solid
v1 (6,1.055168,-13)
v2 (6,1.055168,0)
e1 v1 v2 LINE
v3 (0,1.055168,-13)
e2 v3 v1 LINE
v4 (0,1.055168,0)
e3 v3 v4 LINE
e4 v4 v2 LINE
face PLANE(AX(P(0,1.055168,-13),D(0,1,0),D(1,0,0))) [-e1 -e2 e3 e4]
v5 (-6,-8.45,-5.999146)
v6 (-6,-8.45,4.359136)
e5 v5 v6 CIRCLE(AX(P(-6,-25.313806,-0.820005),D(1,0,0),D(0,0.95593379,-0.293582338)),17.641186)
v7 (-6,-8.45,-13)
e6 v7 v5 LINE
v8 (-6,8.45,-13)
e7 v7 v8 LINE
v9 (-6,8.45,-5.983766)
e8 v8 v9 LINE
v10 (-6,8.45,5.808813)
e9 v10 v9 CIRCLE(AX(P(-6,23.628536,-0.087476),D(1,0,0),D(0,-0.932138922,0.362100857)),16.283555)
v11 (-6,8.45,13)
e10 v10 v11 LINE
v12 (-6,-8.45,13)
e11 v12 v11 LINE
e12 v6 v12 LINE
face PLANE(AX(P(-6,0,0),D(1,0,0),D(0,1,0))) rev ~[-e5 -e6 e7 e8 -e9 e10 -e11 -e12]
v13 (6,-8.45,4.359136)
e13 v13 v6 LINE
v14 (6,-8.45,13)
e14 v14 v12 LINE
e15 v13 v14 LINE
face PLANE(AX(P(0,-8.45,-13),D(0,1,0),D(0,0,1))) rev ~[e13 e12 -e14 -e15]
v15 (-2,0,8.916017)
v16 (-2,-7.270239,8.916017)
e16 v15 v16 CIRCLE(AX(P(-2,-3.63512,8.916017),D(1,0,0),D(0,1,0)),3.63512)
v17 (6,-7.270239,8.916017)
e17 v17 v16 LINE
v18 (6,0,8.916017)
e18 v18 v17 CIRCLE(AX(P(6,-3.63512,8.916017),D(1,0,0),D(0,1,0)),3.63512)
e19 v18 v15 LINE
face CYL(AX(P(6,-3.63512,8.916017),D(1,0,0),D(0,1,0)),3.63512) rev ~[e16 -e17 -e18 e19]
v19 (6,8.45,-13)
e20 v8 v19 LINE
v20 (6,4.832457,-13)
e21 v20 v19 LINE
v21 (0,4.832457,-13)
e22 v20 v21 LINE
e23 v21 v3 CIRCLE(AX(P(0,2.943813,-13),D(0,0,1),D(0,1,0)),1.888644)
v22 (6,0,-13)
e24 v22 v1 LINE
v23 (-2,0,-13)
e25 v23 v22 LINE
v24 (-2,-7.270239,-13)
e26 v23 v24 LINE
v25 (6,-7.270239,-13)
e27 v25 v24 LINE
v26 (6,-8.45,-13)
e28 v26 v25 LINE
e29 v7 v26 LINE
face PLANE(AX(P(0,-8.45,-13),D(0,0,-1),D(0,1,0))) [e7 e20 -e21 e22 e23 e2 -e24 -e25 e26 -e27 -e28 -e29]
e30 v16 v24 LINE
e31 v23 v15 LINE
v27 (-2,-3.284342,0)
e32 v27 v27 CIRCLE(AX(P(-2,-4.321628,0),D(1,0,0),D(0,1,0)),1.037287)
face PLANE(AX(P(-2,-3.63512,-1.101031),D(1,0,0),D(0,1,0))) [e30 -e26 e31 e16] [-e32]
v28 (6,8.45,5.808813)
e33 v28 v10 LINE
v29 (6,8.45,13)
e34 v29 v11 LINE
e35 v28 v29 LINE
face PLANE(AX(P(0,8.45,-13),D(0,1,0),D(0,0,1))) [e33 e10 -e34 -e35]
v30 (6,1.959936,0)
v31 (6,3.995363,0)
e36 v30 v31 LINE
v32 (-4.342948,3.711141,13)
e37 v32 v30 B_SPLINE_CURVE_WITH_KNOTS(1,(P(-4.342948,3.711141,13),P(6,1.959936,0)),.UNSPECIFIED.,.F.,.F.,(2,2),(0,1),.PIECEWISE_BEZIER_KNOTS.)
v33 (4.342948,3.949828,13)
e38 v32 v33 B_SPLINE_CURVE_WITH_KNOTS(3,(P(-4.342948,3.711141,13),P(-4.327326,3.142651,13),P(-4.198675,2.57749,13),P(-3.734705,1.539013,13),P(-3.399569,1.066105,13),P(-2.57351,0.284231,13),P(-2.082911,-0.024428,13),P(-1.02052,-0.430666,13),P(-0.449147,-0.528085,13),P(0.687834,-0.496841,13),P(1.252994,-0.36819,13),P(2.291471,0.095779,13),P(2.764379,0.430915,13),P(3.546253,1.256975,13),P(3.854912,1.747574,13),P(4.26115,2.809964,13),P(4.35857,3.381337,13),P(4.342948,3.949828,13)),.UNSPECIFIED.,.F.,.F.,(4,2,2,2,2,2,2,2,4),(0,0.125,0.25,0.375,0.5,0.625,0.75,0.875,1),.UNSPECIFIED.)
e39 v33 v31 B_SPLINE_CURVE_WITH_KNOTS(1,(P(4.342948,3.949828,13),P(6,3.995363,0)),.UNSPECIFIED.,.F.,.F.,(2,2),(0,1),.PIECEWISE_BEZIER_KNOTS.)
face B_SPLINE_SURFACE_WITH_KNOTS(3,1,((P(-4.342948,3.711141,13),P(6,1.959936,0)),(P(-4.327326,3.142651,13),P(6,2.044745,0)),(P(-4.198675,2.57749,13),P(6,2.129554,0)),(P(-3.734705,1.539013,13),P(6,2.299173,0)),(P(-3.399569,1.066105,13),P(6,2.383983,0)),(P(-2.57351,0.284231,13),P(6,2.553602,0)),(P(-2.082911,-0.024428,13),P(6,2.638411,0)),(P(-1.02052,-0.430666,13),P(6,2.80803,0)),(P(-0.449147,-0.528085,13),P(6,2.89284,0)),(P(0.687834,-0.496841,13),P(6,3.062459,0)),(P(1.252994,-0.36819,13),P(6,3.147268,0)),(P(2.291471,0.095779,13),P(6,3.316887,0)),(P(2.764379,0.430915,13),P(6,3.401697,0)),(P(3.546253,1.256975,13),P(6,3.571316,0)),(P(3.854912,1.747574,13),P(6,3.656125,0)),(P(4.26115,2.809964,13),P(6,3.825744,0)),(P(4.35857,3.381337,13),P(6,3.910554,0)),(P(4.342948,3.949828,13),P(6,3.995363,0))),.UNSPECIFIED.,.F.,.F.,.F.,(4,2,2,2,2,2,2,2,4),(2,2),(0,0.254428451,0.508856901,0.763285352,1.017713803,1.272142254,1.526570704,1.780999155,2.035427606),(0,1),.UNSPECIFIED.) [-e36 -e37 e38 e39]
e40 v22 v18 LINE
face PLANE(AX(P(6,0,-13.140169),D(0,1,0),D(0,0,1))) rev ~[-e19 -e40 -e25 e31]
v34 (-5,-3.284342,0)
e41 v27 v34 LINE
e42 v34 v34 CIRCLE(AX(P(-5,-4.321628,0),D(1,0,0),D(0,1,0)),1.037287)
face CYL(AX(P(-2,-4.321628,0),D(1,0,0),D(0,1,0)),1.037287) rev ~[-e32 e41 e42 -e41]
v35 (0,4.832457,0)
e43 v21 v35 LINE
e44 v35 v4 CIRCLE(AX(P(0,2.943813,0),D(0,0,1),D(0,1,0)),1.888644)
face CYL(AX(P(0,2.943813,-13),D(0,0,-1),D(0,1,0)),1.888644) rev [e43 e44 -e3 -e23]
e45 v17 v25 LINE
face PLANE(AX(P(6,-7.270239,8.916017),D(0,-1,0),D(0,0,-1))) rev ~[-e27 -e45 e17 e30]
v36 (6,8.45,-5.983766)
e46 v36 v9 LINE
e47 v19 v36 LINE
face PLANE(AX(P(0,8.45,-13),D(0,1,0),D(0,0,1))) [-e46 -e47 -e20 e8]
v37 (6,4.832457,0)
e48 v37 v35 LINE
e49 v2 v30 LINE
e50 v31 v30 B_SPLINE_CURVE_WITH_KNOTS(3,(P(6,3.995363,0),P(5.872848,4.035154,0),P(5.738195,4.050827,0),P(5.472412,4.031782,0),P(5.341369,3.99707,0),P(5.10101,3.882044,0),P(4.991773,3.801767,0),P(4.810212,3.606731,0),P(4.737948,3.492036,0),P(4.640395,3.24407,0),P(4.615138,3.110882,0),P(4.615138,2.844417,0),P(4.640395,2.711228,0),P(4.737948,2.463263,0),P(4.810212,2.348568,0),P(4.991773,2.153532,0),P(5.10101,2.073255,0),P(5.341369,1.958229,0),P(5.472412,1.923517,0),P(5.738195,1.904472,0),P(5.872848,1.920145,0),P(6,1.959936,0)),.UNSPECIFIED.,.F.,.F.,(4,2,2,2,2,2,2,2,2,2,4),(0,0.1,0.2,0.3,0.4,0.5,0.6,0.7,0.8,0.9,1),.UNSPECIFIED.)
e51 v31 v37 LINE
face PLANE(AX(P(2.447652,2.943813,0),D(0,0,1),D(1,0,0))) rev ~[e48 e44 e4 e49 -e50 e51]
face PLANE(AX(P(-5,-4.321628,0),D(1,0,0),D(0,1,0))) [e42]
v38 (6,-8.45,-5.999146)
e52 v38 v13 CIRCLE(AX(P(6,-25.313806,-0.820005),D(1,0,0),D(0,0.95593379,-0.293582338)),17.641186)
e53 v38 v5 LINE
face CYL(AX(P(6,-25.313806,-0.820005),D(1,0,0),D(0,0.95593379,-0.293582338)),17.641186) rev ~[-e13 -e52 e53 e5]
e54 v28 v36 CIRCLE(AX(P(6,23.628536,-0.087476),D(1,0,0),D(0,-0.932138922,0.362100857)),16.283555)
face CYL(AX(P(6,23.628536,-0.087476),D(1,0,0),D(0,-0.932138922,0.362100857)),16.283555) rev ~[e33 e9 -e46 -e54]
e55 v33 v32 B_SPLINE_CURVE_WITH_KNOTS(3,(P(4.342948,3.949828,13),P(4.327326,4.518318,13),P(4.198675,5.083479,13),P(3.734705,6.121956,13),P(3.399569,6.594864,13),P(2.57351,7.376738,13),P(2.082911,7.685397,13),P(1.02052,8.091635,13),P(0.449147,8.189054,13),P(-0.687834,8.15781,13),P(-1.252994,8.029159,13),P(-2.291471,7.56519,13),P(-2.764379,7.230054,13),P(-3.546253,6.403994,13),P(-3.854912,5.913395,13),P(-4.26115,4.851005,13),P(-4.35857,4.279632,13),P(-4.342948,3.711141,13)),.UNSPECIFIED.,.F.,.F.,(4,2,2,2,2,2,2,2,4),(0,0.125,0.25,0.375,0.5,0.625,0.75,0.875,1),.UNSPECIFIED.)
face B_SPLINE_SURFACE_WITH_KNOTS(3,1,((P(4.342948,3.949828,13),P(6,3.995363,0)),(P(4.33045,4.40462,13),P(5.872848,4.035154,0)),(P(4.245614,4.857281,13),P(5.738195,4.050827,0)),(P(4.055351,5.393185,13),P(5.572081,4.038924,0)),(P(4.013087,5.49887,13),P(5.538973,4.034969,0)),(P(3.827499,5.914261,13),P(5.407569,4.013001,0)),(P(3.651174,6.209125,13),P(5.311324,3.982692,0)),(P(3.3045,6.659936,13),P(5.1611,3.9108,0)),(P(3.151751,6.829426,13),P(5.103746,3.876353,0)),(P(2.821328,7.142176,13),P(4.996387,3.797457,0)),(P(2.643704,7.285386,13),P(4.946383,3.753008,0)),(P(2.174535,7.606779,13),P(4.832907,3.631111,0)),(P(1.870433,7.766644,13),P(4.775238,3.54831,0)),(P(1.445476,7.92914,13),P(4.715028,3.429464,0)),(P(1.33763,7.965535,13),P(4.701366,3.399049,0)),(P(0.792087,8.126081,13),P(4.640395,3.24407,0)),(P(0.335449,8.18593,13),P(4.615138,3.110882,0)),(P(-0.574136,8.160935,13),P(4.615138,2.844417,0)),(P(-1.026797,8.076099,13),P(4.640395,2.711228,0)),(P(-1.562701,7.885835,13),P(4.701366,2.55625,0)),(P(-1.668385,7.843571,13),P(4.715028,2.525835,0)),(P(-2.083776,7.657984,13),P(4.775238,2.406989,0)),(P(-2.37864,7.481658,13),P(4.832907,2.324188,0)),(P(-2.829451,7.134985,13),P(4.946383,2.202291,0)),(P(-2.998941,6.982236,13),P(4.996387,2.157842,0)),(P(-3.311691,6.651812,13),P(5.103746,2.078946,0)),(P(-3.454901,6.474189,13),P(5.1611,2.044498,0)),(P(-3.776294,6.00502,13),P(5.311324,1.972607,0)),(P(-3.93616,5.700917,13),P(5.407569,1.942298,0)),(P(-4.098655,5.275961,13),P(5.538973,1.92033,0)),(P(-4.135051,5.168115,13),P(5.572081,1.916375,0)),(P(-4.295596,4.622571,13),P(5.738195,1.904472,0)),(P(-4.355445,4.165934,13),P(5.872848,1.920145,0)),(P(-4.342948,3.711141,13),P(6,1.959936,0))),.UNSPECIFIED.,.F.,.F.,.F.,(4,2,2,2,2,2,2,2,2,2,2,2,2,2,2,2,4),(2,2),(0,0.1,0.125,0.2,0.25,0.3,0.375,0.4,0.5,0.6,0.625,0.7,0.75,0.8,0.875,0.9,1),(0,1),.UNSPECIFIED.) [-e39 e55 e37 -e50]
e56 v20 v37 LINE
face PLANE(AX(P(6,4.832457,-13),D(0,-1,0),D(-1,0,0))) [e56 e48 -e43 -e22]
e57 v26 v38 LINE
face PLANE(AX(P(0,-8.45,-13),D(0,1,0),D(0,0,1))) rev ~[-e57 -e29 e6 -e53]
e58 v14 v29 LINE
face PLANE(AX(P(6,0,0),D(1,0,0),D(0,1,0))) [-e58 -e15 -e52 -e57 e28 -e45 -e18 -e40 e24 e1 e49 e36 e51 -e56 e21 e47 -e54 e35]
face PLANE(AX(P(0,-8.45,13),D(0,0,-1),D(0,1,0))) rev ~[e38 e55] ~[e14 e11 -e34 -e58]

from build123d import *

# Parameters (mm, degrees)
F0_W      = 16.9
F0_H      = 26
F1_DEPTH  = 6
F4_DEPTH  = 8
F7_DEPTH  = 13
F13_R     = 1.0372867361
F14_DEPTH = 3
F16_DEPTH = 12


# Not quite as in the source:
# - the arcs of a loft's sections are written as splines that run evenly, so that the points pair up as in the source's solid


with BuildPart() as f1:
    # F0 (on Right) → F1 (new body, symmetric)
    with BuildSketch(Plane.YZ):
        Rectangle(F0_W, F0_H)
    extrude(amount=F1_DEPTH, both=True)

    # F3 (on offset) → F4 (cut)
    with BuildSketch(Plane.YZ.offset(6)):
        with BuildLine():
            Line((0, -13.1401689723), (0, 0))
            Line((0, 0), (0, 8.9160166681))
            ThreePointArc((0, 8.9160166681), (-3.6351196468, 12.5511363149), (-7.2702392936, 8.9160166681))
            Line((-7.2702392936, 8.9160166681), (-7.2702392936, 0))
            Line((-7.2702392936, 0), (-7.2702392936, -13.1401689723))
            Line((-7.2702392936, -13.1401689723), (0, -13.1401689723))
        make_face()
    extrude(amount=-F4_DEPTH, mode=Mode.SUBTRACT)

    # F6 (on offset) → F7 (cut)
    with BuildSketch(Plane.XY.offset(-13)):
        with BuildLine():
            Line((0, 1.0551682208), (6, 1.0551682208))
            Line((6, 1.0551682208), (6, 4.8324568197))
            Line((6, 4.8324568197), (0, 4.8324568197))
            ThreePointArc((0, 4.8324568197), (-1.8886442995, 2.9438125202), (0, 1.0551682208))
        make_face()
    extrude(amount=F7_DEPTH, mode=Mode.SUBTRACT)

    # F10 (on offset) → F11 section 0
    with BuildSketch(Plane.XY.offset(13)):
        with BuildLine():
            add(Edge.make_bspline(
                [(4.3429478235, 3.9498277403), (4.3273258404, 4.518318281), (4.1986746967, 5.0834789619), (3.734705213, 6.1219559637), (3.3995694252, 6.5948636881), (2.5735095721, 7.3767379005), (2.0829105259, 7.6853967543), (1.0205204277, 8.0916349162), (0.4491473807, 8.1890543869), (-0.6878337007, 8.1578104207), (-1.2529943817, 8.0291592769), (-2.2914713834, 7.5651897932), (-2.7643791079, 7.2300540055), (-3.5462533203, 6.4039941523), (-3.8549121741, 5.9133951062), (-4.261150336, 4.8510050079), (-4.3585698066, 4.279631961), (-4.3429478235, 3.7111414202)],
                knots=[0, 0, 0, 0, 0.125, 0.125, 0.25, 0.25, 0.375, 0.375, 0.5, 0.5, 0.625, 0.625, 0.75, 0.75, 0.875, 0.875, 1, 1, 1, 1], degree=3))
            add(Edge.make_bspline(
                [(-4.3429478235, 3.7111414202), (-4.3273258404, 3.1426508795), (-4.1986746967, 2.5774901986), (-3.734705213, 1.5390131968), (-3.3995694252, 1.0661054724), (-2.5735095721, 0.28423126), (-2.0829105259, -0.0244275938), (-1.0205204277, -0.4306657557), (-0.4491473807, -0.5280852264), (0.6878337007, -0.4968412602), (1.2529943817, -0.3681901164), (2.2914713834, 0.0957793673), (2.7643791079, 0.430915155), (3.5462533203, 1.2569750082), (3.8549121741, 1.7475740543), (4.261150336, 2.8099641525), (4.3585698066, 3.3813371995), (4.3429478235, 3.9498277403)],
                knots=[0, 0, 0, 0, 0.125, 0.125, 0.25, 0.25, 0.375, 0.375, 0.5, 0.5, 0.625, 0.625, 0.75, 0.75, 0.875, 0.875, 1, 1, 1, 1], degree=3))
        make_face()
    # F8 (on Top) → F11 section 1
    with BuildSketch(Plane.XY):
        with BuildLine():
            Line((6, 1.9599355292), (6, 3.9953631349))
            add(Edge.make_bspline(
                [(6, 3.9953631349), (5.8728482854, 4.0351535262), (5.7381950052, 4.0508266131), (5.4724119576, 4.0317817528), (5.3413690344, 3.9970700285), (5.1010102922, 3.8820439003), (4.9917730101, 3.8017670809), (4.8102123375, 3.6067310401), (4.7379482715, 3.4920355462), (4.640395332, 3.2440703086), (4.6151383336, 3.110881587), (4.6151383336, 2.844417077), (4.640395332, 2.7112283554), (4.7379482715, 2.4632631178), (4.8102123375, 2.348567624), (4.9917730101, 2.1535315831), (5.1010102922, 2.0732547638), (5.3413690344, 1.9582286356), (5.4724119576, 1.9235169113), (5.7381950052, 1.904472051), (5.8728482854, 1.9201451378), (6, 1.9599355292)],
                knots=[0, 0, 0, 0, 0.1, 0.1, 0.2, 0.2, 0.3, 0.3, 0.4, 0.4, 0.5, 0.5, 0.6, 0.6, 0.7, 0.7, 0.8, 0.8, 0.9, 0.9, 1, 1, 1, 1], degree=3))
        make_face()
    loft(ruled=True, mode=Mode.SUBTRACT)

    # F13 (on offset) → F14 (cut)
    with BuildSketch(Plane.YZ.offset(-2)):
        with Locations((-4.3216282502, 0)):
            Circle(F13_R)
    extrude(amount=-F14_DEPTH, mode=Mode.SUBTRACT)

    # F15 (on offset) → F16 (cut)
    with BuildSketch(Plane.YZ.offset(6)):
        with BuildLine():
            Line((8.45, -5.9837657027), (8.45, 5.8088130318))
            ThreePointArc((8.45, 5.8088130318), (7.3449803731, -0.0874763355), (8.45, -5.9837657027))
        make_face()
        with BuildLine():
            Line((-8.45, 4.3591358699), (-8.45, -5.9991455637))
            ThreePointArc((-8.45, -5.9991455637), (-7.6726197795, -0.8200048469), (-8.45, 4.3591358699))
        make_face()
    extrude(amount=-F16_DEPTH, mode=Mode.SUBTRACT)


solid = f1.part
